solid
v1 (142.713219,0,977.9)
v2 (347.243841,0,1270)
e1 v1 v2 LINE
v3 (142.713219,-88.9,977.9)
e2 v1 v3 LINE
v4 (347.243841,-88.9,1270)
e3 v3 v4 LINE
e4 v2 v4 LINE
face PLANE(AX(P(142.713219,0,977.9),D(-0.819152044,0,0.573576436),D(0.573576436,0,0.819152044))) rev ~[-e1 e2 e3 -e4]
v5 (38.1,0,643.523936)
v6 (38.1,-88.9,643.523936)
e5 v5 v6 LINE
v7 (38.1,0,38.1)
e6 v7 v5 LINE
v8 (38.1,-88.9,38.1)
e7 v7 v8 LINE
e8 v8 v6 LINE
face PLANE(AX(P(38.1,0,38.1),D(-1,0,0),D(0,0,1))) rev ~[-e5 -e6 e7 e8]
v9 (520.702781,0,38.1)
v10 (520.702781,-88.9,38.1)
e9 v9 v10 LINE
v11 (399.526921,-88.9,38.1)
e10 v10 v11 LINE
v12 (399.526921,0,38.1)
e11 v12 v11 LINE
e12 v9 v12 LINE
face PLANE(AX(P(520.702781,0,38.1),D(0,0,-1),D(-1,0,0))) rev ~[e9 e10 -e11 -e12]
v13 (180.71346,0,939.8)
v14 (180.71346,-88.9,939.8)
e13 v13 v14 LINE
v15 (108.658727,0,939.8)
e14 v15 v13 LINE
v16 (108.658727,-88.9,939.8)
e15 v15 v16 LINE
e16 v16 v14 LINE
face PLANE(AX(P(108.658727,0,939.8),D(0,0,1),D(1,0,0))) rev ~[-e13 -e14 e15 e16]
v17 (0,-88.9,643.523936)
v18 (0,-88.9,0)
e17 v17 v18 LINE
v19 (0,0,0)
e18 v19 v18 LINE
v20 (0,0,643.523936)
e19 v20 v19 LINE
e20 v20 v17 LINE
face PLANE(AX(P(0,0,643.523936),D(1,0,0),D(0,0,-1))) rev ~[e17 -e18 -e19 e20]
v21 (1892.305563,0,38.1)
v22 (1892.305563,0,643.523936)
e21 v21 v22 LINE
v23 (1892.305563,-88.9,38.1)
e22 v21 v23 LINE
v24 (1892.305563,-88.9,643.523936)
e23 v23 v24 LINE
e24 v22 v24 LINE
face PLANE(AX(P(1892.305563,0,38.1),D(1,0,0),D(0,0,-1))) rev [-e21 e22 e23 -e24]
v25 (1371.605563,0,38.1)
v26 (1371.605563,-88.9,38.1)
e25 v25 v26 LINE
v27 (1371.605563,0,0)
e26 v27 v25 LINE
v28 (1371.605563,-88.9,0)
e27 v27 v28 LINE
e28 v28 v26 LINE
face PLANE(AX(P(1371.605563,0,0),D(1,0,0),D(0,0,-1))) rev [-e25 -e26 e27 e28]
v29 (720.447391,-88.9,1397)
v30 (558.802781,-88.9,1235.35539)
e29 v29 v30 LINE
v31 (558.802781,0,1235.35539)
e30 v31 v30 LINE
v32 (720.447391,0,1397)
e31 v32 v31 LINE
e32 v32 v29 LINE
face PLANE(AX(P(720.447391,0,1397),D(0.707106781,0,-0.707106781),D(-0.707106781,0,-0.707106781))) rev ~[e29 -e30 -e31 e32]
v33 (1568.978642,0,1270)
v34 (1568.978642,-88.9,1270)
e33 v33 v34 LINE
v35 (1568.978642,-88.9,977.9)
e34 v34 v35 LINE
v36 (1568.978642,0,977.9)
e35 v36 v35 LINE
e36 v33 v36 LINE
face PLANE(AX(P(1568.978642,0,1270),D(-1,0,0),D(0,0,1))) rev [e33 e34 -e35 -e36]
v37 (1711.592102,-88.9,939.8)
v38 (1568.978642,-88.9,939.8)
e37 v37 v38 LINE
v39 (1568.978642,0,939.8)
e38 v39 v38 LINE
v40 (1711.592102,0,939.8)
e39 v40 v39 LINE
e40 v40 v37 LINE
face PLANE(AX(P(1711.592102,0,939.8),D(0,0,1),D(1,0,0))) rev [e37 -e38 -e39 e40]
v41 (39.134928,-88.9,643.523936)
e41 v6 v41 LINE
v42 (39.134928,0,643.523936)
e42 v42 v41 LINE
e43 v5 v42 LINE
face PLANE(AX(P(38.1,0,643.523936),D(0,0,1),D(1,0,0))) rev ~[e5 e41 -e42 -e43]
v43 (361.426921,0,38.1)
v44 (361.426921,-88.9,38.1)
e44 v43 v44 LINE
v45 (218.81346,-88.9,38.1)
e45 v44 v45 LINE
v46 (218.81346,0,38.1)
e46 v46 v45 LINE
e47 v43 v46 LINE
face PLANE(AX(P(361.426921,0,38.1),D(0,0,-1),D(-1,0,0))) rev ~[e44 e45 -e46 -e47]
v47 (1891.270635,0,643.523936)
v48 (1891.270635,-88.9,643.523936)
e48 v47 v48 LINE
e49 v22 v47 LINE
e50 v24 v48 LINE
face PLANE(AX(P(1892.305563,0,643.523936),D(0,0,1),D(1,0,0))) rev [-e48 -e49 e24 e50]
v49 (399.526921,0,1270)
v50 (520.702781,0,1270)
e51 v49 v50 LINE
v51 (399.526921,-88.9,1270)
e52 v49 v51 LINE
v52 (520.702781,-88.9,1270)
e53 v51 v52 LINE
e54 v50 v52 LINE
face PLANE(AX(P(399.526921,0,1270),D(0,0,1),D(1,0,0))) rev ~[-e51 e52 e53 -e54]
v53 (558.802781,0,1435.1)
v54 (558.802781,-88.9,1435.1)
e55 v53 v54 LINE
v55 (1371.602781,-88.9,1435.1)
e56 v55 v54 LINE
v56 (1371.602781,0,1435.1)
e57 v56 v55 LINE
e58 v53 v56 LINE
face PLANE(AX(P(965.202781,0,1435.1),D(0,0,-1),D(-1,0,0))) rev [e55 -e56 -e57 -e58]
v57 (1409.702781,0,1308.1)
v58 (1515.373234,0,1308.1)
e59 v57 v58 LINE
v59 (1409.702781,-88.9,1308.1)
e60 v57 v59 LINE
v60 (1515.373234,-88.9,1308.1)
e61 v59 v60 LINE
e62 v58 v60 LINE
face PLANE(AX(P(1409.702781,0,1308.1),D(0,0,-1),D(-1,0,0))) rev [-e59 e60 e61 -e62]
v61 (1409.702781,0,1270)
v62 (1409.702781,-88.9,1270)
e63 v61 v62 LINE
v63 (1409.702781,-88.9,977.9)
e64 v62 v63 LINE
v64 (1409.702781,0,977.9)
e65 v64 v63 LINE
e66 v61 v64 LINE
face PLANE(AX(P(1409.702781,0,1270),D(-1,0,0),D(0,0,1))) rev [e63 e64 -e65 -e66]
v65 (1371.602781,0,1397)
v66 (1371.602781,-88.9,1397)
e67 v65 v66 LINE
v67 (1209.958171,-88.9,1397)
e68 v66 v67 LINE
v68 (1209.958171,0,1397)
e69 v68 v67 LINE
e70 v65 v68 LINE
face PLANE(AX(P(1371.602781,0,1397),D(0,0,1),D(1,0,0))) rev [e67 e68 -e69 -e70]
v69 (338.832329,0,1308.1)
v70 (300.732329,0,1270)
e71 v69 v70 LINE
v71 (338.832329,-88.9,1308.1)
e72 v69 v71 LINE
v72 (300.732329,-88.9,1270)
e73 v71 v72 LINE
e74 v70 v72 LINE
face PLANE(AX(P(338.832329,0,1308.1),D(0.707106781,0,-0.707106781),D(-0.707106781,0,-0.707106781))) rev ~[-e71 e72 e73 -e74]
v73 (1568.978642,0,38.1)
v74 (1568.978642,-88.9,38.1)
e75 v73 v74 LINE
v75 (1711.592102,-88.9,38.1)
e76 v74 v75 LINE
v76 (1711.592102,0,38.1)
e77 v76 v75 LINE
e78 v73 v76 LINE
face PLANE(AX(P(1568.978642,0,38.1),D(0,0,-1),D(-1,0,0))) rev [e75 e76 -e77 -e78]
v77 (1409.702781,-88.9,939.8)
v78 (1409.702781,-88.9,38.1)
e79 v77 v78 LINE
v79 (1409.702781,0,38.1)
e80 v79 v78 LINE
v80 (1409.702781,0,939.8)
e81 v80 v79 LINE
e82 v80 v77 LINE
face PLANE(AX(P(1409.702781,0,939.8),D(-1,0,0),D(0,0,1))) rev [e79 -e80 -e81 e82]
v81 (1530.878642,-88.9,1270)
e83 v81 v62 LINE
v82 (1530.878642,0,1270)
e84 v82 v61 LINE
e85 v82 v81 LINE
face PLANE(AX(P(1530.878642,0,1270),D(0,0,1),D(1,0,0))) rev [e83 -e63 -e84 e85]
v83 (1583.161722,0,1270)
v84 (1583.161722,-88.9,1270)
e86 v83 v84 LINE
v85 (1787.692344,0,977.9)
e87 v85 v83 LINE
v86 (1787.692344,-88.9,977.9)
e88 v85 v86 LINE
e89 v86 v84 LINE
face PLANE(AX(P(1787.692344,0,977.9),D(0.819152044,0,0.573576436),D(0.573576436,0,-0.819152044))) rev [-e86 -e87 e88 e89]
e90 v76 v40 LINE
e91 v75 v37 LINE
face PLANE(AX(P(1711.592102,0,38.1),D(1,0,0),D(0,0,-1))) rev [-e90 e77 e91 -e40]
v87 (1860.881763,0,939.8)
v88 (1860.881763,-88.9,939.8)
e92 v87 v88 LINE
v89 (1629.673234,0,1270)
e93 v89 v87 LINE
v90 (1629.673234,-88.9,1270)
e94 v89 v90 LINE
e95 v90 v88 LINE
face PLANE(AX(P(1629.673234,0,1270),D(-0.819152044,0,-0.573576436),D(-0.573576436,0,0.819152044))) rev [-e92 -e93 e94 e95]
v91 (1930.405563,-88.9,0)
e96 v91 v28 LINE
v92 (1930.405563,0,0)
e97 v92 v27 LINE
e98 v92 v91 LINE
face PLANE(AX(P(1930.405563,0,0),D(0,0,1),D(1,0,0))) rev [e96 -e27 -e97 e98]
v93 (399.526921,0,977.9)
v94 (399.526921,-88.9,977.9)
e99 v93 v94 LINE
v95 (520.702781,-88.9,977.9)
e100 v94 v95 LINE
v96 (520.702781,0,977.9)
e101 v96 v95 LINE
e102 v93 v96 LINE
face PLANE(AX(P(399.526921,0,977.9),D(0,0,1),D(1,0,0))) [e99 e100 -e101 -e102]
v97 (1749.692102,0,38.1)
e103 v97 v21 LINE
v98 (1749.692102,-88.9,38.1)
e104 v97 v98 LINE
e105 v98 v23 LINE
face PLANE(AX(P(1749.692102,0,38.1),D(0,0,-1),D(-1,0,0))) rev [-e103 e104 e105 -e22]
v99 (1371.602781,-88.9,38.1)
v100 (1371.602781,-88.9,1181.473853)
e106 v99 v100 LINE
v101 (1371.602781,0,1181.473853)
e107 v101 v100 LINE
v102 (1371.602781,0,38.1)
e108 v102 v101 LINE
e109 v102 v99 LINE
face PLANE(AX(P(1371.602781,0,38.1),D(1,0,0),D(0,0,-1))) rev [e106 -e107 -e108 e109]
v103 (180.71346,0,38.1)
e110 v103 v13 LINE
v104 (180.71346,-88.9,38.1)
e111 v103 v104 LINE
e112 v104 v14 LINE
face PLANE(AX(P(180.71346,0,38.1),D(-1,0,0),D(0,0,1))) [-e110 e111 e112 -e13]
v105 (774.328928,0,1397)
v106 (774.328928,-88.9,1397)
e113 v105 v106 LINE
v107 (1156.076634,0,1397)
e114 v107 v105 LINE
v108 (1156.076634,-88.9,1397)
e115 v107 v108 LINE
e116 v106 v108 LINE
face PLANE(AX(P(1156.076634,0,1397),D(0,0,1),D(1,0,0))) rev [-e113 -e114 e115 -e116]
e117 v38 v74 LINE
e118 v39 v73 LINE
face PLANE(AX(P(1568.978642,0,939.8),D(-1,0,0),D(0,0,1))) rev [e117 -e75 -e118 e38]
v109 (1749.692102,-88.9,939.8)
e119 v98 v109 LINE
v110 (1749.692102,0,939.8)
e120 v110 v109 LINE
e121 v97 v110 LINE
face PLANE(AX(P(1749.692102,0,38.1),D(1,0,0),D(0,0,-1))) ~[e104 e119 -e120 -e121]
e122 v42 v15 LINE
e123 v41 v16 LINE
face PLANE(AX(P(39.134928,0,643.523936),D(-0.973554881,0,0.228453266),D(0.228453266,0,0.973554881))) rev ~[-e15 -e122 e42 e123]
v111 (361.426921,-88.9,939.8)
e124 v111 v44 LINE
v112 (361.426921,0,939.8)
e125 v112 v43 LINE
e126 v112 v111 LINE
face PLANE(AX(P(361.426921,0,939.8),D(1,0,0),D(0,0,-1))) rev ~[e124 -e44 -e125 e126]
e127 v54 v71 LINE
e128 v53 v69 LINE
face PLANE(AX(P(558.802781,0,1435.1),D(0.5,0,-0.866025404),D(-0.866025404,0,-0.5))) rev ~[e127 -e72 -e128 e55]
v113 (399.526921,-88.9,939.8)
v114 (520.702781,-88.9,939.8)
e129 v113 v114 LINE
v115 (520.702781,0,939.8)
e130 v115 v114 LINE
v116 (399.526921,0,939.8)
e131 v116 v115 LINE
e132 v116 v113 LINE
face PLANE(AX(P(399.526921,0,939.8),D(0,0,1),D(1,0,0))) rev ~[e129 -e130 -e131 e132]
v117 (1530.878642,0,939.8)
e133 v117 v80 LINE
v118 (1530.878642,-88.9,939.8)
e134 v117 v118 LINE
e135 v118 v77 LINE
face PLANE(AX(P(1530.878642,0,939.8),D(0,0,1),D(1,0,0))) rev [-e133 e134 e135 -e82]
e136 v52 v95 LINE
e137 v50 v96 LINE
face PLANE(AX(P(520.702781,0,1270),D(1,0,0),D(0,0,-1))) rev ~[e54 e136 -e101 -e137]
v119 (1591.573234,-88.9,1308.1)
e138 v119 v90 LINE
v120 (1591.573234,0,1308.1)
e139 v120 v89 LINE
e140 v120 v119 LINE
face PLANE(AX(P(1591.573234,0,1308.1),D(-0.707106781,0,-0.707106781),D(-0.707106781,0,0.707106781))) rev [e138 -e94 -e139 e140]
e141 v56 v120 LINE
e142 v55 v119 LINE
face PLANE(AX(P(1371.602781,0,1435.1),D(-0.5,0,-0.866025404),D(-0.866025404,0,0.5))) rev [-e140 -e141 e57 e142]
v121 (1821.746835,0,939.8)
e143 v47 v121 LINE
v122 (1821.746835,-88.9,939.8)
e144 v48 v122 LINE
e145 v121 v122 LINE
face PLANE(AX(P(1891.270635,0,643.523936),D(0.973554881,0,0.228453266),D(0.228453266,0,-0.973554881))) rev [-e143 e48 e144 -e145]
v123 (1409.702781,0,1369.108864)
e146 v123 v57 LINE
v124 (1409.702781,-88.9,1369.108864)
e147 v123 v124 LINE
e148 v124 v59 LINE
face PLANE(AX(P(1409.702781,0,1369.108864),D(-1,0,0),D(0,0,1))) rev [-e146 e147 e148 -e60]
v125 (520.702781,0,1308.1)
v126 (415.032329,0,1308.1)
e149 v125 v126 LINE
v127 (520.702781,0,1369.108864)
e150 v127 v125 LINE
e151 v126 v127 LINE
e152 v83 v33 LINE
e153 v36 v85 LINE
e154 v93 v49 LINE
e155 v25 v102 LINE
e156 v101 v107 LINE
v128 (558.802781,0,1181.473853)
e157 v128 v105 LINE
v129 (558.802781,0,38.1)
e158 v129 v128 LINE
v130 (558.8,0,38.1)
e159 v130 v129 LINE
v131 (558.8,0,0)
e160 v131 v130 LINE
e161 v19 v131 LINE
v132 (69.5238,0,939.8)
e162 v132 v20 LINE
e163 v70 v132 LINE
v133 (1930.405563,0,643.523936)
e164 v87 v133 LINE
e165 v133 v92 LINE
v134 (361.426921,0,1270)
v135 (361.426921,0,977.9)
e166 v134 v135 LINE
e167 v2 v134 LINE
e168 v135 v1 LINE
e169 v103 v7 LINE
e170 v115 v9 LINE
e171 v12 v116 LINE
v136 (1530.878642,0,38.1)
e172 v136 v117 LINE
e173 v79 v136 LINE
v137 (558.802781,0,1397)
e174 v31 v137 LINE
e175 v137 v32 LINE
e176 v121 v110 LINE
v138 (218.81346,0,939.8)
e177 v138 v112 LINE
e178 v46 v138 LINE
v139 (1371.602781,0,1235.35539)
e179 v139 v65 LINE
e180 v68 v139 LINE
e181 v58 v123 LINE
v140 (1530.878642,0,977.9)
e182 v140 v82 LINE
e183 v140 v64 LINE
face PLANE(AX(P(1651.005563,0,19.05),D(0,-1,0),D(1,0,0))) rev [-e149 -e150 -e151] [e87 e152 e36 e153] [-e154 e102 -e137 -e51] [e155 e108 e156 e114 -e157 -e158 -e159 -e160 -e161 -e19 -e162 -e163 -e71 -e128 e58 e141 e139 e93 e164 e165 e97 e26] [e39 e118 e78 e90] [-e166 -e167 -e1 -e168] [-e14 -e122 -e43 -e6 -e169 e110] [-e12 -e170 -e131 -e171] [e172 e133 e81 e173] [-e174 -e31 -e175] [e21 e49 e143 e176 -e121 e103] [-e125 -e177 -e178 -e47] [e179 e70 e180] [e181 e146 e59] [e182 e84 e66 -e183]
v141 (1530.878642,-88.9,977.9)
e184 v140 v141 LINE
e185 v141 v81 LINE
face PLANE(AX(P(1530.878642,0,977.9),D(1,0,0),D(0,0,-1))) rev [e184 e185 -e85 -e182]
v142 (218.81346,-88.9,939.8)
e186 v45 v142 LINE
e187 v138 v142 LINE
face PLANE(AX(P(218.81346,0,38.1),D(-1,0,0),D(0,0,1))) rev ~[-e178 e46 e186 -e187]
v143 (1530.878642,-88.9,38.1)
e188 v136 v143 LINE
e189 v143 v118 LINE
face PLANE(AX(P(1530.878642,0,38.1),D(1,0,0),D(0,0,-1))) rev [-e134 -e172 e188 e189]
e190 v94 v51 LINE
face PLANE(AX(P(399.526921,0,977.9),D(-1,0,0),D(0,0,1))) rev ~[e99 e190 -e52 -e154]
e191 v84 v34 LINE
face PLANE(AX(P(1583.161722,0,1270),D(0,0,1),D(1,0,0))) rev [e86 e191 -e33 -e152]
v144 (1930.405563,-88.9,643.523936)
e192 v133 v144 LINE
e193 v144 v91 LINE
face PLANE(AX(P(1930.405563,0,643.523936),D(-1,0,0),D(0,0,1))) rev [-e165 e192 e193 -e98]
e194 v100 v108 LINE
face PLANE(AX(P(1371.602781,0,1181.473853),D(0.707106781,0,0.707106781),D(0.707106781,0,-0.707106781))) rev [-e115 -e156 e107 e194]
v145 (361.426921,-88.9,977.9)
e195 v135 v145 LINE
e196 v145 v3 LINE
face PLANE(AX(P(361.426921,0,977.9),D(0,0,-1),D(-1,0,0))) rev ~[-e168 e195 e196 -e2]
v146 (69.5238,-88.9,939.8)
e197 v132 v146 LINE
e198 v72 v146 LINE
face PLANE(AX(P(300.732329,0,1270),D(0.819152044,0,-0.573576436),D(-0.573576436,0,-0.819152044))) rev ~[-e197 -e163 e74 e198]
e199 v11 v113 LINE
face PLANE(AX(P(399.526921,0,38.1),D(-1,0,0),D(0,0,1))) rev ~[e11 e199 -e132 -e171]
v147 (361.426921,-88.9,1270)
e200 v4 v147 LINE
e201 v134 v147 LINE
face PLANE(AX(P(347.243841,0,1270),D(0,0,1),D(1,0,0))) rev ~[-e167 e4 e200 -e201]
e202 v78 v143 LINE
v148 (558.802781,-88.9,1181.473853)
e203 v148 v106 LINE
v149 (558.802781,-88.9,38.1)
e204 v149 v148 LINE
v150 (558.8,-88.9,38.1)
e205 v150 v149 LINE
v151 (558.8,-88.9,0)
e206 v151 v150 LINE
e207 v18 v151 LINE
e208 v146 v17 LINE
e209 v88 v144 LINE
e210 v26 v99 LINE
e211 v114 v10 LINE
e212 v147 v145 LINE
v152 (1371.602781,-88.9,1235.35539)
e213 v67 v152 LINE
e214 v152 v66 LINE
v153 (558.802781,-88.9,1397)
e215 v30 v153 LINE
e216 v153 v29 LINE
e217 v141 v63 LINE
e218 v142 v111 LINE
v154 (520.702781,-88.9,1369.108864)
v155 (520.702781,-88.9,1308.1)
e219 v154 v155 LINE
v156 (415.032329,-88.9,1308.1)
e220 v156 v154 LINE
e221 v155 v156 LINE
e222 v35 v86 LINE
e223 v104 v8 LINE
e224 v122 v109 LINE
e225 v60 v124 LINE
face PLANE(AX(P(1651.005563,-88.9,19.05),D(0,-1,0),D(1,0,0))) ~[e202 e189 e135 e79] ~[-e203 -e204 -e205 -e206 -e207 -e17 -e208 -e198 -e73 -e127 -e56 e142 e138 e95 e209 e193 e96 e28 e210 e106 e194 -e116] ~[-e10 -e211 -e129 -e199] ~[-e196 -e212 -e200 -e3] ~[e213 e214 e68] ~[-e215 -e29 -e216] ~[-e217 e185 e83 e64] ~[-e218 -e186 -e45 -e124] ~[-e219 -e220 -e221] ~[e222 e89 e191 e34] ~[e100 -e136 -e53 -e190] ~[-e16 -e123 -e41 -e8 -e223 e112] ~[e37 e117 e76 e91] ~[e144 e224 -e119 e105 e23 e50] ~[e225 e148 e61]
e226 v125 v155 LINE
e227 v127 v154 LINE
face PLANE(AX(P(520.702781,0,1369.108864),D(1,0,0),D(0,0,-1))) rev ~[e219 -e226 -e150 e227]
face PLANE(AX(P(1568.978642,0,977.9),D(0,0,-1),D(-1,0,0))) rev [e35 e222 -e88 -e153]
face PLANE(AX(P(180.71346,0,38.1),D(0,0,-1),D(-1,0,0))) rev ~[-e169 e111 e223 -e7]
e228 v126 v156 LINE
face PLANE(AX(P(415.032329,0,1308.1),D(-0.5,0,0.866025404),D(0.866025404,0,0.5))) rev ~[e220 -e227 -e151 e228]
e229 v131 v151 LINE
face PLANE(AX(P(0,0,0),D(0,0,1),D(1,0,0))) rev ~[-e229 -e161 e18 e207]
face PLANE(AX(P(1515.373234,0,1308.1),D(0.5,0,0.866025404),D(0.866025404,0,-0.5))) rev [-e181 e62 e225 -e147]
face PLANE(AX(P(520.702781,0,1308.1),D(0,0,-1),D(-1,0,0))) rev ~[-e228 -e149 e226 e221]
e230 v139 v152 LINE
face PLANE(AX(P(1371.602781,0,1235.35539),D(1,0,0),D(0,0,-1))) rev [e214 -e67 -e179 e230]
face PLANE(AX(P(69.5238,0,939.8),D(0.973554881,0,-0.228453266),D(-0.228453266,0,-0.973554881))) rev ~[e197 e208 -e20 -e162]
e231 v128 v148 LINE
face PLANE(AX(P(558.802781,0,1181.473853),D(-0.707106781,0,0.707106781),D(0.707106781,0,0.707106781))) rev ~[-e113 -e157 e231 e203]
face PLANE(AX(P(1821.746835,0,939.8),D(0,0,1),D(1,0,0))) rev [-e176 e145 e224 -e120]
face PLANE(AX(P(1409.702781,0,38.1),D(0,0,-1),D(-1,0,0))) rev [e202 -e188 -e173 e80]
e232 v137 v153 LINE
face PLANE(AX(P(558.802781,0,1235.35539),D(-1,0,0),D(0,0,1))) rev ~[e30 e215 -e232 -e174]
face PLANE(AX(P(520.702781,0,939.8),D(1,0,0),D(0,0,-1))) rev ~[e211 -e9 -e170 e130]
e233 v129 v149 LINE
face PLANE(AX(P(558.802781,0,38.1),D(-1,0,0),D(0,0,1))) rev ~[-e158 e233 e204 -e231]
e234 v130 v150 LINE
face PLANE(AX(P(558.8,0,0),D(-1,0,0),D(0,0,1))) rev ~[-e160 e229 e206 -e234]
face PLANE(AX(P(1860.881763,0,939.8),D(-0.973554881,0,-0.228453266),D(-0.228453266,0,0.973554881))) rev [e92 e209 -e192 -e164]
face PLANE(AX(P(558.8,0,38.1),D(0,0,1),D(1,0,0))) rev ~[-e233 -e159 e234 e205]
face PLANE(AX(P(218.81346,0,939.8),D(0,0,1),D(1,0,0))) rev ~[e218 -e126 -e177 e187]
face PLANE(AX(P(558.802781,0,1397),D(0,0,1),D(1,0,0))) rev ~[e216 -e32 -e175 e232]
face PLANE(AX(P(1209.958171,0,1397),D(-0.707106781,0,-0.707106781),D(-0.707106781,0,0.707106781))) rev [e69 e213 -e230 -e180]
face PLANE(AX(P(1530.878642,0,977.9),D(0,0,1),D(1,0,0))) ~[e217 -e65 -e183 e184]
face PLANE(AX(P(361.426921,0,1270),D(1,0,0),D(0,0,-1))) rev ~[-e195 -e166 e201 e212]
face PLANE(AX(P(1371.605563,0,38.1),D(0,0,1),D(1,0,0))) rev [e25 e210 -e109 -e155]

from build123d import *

# Parameters (mm, degrees)
F0_W     = 38.1
F0_H     = 605.4239357613
F0_H_2   = 901.7
F0_W_2   = 121.1758604333
F0_H_3   = 38.1
F1_DEPTH = 88.9


# Not quite as in the source:
# - a feature names something its author has since deleted; it is built from what else it names


with BuildPart() as f1:
    # F0 (on Front) → F1 (new body)
    with BuildSketch(Plane.XZ):
        Polygon((0, 38.1), (0, 0), (558.8, 0), (558.8, 38.1), (520.7027813, 38.1), (399.5269208667, 38.1), (361.4269208667, 38.1), (218.8134604333, 38.1), (180.7134604333, 38.1), (38.1, 38.1), align=None)
        with Locations((19.05, 340.8119678807)):
            Rectangle(F0_W, F0_H)
        Polygon((520.7027813, 38.1), (558.8, 38.1), (558.8027813, 38.1), (558.8027813, 939.8), (558.8027813, 1181.4738530943), (558.8027813, 1235.3553898208), (558.8027813, 1270), (520.7027813, 1270), (520.7027813, 977.9), (520.7027813, 939.8), align=None)
        Polygon((69.5237996219, 939.8), (0, 643.5239357613), (38.1, 643.5239357613), (39.1349278428, 643.5239357613), (108.6587274647, 939.8), align=None)
        with Locations((199.7634604333, 488.95)):
            Rectangle(F0_W, F0_H_2)
        Polygon((96.2017068277, 977.9), (69.5237996219, 939.8), (108.6587274647, 939.8), (180.7134604333, 939.8), (218.8134604333, 939.8), (361.4269208667, 939.8), (361.4269208667, 977.9), (142.7132186595, 977.9), align=None)
        Polygon((361.4269208667, 38.1), (399.5269208667, 38.1), (399.5269208667, 939.8), (399.5269208667, 977.9), (399.5269208667, 1270), (361.4269208667, 1270), (361.4269208667, 977.9), (361.4269208667, 939.8), align=None)
        with Locations((460.1148510833, 958.85)):
            Rectangle(F0_W_2, F0_H_3)
        Polygon((300.7323287388, 1270), (96.2017068277, 977.9), (142.7132186595, 977.9), (347.2438405706, 1270), align=None)
        Polygon((558.8027813, 1235.3553898208), (558.8027813, 1181.4738530943), (774.3289282057, 1397), (720.4473914792, 1397), align=None)
        Polygon((338.8323287388, 1308.1), (300.7323287388, 1270), (347.2438405706, 1270), (361.4269208667, 1270), (399.5269208667, 1270), (520.7027813, 1270), (558.8027813, 1270), (558.8027813, 1308.1), (520.7027813, 1308.1), (415.0323287388, 1308.1), (339.9874666667, 1308.1), align=None)
        Polygon((720.4473914792, 1397), (774.3289282057, 1397), (965.2027813, 1397), (965.2027813, 1435.1), (558.8027813, 1435.1), (558.8027813, 1397), align=None)
        Polygon((558.8027813, 1435.1), (338.8323287388, 1308.1), (339.9874666667, 1308.1), (415.0323287388, 1308.1), (520.7027813, 1369.1088642316), (558.8027813, 1391.1059094878), (558.8027813, 1397), align=None)
        Polygon((520.7027813, 1308.1), (558.8027813, 1308.1), (558.8027813, 1391.1059094878), (520.7027813, 1369.1088642316), align=None)
    extrude(amount=F1_DEPTH)

    # F2: F1 across face


with BuildPart() as f1_1:
    add(f1.part)
    add(f1.part.mirror(Plane(origin=(965.2027813, -44.45, 1416.05), x_dir=(0, 1, 0), z_dir=(1, 0, 0))))


solid = f1_1.part
